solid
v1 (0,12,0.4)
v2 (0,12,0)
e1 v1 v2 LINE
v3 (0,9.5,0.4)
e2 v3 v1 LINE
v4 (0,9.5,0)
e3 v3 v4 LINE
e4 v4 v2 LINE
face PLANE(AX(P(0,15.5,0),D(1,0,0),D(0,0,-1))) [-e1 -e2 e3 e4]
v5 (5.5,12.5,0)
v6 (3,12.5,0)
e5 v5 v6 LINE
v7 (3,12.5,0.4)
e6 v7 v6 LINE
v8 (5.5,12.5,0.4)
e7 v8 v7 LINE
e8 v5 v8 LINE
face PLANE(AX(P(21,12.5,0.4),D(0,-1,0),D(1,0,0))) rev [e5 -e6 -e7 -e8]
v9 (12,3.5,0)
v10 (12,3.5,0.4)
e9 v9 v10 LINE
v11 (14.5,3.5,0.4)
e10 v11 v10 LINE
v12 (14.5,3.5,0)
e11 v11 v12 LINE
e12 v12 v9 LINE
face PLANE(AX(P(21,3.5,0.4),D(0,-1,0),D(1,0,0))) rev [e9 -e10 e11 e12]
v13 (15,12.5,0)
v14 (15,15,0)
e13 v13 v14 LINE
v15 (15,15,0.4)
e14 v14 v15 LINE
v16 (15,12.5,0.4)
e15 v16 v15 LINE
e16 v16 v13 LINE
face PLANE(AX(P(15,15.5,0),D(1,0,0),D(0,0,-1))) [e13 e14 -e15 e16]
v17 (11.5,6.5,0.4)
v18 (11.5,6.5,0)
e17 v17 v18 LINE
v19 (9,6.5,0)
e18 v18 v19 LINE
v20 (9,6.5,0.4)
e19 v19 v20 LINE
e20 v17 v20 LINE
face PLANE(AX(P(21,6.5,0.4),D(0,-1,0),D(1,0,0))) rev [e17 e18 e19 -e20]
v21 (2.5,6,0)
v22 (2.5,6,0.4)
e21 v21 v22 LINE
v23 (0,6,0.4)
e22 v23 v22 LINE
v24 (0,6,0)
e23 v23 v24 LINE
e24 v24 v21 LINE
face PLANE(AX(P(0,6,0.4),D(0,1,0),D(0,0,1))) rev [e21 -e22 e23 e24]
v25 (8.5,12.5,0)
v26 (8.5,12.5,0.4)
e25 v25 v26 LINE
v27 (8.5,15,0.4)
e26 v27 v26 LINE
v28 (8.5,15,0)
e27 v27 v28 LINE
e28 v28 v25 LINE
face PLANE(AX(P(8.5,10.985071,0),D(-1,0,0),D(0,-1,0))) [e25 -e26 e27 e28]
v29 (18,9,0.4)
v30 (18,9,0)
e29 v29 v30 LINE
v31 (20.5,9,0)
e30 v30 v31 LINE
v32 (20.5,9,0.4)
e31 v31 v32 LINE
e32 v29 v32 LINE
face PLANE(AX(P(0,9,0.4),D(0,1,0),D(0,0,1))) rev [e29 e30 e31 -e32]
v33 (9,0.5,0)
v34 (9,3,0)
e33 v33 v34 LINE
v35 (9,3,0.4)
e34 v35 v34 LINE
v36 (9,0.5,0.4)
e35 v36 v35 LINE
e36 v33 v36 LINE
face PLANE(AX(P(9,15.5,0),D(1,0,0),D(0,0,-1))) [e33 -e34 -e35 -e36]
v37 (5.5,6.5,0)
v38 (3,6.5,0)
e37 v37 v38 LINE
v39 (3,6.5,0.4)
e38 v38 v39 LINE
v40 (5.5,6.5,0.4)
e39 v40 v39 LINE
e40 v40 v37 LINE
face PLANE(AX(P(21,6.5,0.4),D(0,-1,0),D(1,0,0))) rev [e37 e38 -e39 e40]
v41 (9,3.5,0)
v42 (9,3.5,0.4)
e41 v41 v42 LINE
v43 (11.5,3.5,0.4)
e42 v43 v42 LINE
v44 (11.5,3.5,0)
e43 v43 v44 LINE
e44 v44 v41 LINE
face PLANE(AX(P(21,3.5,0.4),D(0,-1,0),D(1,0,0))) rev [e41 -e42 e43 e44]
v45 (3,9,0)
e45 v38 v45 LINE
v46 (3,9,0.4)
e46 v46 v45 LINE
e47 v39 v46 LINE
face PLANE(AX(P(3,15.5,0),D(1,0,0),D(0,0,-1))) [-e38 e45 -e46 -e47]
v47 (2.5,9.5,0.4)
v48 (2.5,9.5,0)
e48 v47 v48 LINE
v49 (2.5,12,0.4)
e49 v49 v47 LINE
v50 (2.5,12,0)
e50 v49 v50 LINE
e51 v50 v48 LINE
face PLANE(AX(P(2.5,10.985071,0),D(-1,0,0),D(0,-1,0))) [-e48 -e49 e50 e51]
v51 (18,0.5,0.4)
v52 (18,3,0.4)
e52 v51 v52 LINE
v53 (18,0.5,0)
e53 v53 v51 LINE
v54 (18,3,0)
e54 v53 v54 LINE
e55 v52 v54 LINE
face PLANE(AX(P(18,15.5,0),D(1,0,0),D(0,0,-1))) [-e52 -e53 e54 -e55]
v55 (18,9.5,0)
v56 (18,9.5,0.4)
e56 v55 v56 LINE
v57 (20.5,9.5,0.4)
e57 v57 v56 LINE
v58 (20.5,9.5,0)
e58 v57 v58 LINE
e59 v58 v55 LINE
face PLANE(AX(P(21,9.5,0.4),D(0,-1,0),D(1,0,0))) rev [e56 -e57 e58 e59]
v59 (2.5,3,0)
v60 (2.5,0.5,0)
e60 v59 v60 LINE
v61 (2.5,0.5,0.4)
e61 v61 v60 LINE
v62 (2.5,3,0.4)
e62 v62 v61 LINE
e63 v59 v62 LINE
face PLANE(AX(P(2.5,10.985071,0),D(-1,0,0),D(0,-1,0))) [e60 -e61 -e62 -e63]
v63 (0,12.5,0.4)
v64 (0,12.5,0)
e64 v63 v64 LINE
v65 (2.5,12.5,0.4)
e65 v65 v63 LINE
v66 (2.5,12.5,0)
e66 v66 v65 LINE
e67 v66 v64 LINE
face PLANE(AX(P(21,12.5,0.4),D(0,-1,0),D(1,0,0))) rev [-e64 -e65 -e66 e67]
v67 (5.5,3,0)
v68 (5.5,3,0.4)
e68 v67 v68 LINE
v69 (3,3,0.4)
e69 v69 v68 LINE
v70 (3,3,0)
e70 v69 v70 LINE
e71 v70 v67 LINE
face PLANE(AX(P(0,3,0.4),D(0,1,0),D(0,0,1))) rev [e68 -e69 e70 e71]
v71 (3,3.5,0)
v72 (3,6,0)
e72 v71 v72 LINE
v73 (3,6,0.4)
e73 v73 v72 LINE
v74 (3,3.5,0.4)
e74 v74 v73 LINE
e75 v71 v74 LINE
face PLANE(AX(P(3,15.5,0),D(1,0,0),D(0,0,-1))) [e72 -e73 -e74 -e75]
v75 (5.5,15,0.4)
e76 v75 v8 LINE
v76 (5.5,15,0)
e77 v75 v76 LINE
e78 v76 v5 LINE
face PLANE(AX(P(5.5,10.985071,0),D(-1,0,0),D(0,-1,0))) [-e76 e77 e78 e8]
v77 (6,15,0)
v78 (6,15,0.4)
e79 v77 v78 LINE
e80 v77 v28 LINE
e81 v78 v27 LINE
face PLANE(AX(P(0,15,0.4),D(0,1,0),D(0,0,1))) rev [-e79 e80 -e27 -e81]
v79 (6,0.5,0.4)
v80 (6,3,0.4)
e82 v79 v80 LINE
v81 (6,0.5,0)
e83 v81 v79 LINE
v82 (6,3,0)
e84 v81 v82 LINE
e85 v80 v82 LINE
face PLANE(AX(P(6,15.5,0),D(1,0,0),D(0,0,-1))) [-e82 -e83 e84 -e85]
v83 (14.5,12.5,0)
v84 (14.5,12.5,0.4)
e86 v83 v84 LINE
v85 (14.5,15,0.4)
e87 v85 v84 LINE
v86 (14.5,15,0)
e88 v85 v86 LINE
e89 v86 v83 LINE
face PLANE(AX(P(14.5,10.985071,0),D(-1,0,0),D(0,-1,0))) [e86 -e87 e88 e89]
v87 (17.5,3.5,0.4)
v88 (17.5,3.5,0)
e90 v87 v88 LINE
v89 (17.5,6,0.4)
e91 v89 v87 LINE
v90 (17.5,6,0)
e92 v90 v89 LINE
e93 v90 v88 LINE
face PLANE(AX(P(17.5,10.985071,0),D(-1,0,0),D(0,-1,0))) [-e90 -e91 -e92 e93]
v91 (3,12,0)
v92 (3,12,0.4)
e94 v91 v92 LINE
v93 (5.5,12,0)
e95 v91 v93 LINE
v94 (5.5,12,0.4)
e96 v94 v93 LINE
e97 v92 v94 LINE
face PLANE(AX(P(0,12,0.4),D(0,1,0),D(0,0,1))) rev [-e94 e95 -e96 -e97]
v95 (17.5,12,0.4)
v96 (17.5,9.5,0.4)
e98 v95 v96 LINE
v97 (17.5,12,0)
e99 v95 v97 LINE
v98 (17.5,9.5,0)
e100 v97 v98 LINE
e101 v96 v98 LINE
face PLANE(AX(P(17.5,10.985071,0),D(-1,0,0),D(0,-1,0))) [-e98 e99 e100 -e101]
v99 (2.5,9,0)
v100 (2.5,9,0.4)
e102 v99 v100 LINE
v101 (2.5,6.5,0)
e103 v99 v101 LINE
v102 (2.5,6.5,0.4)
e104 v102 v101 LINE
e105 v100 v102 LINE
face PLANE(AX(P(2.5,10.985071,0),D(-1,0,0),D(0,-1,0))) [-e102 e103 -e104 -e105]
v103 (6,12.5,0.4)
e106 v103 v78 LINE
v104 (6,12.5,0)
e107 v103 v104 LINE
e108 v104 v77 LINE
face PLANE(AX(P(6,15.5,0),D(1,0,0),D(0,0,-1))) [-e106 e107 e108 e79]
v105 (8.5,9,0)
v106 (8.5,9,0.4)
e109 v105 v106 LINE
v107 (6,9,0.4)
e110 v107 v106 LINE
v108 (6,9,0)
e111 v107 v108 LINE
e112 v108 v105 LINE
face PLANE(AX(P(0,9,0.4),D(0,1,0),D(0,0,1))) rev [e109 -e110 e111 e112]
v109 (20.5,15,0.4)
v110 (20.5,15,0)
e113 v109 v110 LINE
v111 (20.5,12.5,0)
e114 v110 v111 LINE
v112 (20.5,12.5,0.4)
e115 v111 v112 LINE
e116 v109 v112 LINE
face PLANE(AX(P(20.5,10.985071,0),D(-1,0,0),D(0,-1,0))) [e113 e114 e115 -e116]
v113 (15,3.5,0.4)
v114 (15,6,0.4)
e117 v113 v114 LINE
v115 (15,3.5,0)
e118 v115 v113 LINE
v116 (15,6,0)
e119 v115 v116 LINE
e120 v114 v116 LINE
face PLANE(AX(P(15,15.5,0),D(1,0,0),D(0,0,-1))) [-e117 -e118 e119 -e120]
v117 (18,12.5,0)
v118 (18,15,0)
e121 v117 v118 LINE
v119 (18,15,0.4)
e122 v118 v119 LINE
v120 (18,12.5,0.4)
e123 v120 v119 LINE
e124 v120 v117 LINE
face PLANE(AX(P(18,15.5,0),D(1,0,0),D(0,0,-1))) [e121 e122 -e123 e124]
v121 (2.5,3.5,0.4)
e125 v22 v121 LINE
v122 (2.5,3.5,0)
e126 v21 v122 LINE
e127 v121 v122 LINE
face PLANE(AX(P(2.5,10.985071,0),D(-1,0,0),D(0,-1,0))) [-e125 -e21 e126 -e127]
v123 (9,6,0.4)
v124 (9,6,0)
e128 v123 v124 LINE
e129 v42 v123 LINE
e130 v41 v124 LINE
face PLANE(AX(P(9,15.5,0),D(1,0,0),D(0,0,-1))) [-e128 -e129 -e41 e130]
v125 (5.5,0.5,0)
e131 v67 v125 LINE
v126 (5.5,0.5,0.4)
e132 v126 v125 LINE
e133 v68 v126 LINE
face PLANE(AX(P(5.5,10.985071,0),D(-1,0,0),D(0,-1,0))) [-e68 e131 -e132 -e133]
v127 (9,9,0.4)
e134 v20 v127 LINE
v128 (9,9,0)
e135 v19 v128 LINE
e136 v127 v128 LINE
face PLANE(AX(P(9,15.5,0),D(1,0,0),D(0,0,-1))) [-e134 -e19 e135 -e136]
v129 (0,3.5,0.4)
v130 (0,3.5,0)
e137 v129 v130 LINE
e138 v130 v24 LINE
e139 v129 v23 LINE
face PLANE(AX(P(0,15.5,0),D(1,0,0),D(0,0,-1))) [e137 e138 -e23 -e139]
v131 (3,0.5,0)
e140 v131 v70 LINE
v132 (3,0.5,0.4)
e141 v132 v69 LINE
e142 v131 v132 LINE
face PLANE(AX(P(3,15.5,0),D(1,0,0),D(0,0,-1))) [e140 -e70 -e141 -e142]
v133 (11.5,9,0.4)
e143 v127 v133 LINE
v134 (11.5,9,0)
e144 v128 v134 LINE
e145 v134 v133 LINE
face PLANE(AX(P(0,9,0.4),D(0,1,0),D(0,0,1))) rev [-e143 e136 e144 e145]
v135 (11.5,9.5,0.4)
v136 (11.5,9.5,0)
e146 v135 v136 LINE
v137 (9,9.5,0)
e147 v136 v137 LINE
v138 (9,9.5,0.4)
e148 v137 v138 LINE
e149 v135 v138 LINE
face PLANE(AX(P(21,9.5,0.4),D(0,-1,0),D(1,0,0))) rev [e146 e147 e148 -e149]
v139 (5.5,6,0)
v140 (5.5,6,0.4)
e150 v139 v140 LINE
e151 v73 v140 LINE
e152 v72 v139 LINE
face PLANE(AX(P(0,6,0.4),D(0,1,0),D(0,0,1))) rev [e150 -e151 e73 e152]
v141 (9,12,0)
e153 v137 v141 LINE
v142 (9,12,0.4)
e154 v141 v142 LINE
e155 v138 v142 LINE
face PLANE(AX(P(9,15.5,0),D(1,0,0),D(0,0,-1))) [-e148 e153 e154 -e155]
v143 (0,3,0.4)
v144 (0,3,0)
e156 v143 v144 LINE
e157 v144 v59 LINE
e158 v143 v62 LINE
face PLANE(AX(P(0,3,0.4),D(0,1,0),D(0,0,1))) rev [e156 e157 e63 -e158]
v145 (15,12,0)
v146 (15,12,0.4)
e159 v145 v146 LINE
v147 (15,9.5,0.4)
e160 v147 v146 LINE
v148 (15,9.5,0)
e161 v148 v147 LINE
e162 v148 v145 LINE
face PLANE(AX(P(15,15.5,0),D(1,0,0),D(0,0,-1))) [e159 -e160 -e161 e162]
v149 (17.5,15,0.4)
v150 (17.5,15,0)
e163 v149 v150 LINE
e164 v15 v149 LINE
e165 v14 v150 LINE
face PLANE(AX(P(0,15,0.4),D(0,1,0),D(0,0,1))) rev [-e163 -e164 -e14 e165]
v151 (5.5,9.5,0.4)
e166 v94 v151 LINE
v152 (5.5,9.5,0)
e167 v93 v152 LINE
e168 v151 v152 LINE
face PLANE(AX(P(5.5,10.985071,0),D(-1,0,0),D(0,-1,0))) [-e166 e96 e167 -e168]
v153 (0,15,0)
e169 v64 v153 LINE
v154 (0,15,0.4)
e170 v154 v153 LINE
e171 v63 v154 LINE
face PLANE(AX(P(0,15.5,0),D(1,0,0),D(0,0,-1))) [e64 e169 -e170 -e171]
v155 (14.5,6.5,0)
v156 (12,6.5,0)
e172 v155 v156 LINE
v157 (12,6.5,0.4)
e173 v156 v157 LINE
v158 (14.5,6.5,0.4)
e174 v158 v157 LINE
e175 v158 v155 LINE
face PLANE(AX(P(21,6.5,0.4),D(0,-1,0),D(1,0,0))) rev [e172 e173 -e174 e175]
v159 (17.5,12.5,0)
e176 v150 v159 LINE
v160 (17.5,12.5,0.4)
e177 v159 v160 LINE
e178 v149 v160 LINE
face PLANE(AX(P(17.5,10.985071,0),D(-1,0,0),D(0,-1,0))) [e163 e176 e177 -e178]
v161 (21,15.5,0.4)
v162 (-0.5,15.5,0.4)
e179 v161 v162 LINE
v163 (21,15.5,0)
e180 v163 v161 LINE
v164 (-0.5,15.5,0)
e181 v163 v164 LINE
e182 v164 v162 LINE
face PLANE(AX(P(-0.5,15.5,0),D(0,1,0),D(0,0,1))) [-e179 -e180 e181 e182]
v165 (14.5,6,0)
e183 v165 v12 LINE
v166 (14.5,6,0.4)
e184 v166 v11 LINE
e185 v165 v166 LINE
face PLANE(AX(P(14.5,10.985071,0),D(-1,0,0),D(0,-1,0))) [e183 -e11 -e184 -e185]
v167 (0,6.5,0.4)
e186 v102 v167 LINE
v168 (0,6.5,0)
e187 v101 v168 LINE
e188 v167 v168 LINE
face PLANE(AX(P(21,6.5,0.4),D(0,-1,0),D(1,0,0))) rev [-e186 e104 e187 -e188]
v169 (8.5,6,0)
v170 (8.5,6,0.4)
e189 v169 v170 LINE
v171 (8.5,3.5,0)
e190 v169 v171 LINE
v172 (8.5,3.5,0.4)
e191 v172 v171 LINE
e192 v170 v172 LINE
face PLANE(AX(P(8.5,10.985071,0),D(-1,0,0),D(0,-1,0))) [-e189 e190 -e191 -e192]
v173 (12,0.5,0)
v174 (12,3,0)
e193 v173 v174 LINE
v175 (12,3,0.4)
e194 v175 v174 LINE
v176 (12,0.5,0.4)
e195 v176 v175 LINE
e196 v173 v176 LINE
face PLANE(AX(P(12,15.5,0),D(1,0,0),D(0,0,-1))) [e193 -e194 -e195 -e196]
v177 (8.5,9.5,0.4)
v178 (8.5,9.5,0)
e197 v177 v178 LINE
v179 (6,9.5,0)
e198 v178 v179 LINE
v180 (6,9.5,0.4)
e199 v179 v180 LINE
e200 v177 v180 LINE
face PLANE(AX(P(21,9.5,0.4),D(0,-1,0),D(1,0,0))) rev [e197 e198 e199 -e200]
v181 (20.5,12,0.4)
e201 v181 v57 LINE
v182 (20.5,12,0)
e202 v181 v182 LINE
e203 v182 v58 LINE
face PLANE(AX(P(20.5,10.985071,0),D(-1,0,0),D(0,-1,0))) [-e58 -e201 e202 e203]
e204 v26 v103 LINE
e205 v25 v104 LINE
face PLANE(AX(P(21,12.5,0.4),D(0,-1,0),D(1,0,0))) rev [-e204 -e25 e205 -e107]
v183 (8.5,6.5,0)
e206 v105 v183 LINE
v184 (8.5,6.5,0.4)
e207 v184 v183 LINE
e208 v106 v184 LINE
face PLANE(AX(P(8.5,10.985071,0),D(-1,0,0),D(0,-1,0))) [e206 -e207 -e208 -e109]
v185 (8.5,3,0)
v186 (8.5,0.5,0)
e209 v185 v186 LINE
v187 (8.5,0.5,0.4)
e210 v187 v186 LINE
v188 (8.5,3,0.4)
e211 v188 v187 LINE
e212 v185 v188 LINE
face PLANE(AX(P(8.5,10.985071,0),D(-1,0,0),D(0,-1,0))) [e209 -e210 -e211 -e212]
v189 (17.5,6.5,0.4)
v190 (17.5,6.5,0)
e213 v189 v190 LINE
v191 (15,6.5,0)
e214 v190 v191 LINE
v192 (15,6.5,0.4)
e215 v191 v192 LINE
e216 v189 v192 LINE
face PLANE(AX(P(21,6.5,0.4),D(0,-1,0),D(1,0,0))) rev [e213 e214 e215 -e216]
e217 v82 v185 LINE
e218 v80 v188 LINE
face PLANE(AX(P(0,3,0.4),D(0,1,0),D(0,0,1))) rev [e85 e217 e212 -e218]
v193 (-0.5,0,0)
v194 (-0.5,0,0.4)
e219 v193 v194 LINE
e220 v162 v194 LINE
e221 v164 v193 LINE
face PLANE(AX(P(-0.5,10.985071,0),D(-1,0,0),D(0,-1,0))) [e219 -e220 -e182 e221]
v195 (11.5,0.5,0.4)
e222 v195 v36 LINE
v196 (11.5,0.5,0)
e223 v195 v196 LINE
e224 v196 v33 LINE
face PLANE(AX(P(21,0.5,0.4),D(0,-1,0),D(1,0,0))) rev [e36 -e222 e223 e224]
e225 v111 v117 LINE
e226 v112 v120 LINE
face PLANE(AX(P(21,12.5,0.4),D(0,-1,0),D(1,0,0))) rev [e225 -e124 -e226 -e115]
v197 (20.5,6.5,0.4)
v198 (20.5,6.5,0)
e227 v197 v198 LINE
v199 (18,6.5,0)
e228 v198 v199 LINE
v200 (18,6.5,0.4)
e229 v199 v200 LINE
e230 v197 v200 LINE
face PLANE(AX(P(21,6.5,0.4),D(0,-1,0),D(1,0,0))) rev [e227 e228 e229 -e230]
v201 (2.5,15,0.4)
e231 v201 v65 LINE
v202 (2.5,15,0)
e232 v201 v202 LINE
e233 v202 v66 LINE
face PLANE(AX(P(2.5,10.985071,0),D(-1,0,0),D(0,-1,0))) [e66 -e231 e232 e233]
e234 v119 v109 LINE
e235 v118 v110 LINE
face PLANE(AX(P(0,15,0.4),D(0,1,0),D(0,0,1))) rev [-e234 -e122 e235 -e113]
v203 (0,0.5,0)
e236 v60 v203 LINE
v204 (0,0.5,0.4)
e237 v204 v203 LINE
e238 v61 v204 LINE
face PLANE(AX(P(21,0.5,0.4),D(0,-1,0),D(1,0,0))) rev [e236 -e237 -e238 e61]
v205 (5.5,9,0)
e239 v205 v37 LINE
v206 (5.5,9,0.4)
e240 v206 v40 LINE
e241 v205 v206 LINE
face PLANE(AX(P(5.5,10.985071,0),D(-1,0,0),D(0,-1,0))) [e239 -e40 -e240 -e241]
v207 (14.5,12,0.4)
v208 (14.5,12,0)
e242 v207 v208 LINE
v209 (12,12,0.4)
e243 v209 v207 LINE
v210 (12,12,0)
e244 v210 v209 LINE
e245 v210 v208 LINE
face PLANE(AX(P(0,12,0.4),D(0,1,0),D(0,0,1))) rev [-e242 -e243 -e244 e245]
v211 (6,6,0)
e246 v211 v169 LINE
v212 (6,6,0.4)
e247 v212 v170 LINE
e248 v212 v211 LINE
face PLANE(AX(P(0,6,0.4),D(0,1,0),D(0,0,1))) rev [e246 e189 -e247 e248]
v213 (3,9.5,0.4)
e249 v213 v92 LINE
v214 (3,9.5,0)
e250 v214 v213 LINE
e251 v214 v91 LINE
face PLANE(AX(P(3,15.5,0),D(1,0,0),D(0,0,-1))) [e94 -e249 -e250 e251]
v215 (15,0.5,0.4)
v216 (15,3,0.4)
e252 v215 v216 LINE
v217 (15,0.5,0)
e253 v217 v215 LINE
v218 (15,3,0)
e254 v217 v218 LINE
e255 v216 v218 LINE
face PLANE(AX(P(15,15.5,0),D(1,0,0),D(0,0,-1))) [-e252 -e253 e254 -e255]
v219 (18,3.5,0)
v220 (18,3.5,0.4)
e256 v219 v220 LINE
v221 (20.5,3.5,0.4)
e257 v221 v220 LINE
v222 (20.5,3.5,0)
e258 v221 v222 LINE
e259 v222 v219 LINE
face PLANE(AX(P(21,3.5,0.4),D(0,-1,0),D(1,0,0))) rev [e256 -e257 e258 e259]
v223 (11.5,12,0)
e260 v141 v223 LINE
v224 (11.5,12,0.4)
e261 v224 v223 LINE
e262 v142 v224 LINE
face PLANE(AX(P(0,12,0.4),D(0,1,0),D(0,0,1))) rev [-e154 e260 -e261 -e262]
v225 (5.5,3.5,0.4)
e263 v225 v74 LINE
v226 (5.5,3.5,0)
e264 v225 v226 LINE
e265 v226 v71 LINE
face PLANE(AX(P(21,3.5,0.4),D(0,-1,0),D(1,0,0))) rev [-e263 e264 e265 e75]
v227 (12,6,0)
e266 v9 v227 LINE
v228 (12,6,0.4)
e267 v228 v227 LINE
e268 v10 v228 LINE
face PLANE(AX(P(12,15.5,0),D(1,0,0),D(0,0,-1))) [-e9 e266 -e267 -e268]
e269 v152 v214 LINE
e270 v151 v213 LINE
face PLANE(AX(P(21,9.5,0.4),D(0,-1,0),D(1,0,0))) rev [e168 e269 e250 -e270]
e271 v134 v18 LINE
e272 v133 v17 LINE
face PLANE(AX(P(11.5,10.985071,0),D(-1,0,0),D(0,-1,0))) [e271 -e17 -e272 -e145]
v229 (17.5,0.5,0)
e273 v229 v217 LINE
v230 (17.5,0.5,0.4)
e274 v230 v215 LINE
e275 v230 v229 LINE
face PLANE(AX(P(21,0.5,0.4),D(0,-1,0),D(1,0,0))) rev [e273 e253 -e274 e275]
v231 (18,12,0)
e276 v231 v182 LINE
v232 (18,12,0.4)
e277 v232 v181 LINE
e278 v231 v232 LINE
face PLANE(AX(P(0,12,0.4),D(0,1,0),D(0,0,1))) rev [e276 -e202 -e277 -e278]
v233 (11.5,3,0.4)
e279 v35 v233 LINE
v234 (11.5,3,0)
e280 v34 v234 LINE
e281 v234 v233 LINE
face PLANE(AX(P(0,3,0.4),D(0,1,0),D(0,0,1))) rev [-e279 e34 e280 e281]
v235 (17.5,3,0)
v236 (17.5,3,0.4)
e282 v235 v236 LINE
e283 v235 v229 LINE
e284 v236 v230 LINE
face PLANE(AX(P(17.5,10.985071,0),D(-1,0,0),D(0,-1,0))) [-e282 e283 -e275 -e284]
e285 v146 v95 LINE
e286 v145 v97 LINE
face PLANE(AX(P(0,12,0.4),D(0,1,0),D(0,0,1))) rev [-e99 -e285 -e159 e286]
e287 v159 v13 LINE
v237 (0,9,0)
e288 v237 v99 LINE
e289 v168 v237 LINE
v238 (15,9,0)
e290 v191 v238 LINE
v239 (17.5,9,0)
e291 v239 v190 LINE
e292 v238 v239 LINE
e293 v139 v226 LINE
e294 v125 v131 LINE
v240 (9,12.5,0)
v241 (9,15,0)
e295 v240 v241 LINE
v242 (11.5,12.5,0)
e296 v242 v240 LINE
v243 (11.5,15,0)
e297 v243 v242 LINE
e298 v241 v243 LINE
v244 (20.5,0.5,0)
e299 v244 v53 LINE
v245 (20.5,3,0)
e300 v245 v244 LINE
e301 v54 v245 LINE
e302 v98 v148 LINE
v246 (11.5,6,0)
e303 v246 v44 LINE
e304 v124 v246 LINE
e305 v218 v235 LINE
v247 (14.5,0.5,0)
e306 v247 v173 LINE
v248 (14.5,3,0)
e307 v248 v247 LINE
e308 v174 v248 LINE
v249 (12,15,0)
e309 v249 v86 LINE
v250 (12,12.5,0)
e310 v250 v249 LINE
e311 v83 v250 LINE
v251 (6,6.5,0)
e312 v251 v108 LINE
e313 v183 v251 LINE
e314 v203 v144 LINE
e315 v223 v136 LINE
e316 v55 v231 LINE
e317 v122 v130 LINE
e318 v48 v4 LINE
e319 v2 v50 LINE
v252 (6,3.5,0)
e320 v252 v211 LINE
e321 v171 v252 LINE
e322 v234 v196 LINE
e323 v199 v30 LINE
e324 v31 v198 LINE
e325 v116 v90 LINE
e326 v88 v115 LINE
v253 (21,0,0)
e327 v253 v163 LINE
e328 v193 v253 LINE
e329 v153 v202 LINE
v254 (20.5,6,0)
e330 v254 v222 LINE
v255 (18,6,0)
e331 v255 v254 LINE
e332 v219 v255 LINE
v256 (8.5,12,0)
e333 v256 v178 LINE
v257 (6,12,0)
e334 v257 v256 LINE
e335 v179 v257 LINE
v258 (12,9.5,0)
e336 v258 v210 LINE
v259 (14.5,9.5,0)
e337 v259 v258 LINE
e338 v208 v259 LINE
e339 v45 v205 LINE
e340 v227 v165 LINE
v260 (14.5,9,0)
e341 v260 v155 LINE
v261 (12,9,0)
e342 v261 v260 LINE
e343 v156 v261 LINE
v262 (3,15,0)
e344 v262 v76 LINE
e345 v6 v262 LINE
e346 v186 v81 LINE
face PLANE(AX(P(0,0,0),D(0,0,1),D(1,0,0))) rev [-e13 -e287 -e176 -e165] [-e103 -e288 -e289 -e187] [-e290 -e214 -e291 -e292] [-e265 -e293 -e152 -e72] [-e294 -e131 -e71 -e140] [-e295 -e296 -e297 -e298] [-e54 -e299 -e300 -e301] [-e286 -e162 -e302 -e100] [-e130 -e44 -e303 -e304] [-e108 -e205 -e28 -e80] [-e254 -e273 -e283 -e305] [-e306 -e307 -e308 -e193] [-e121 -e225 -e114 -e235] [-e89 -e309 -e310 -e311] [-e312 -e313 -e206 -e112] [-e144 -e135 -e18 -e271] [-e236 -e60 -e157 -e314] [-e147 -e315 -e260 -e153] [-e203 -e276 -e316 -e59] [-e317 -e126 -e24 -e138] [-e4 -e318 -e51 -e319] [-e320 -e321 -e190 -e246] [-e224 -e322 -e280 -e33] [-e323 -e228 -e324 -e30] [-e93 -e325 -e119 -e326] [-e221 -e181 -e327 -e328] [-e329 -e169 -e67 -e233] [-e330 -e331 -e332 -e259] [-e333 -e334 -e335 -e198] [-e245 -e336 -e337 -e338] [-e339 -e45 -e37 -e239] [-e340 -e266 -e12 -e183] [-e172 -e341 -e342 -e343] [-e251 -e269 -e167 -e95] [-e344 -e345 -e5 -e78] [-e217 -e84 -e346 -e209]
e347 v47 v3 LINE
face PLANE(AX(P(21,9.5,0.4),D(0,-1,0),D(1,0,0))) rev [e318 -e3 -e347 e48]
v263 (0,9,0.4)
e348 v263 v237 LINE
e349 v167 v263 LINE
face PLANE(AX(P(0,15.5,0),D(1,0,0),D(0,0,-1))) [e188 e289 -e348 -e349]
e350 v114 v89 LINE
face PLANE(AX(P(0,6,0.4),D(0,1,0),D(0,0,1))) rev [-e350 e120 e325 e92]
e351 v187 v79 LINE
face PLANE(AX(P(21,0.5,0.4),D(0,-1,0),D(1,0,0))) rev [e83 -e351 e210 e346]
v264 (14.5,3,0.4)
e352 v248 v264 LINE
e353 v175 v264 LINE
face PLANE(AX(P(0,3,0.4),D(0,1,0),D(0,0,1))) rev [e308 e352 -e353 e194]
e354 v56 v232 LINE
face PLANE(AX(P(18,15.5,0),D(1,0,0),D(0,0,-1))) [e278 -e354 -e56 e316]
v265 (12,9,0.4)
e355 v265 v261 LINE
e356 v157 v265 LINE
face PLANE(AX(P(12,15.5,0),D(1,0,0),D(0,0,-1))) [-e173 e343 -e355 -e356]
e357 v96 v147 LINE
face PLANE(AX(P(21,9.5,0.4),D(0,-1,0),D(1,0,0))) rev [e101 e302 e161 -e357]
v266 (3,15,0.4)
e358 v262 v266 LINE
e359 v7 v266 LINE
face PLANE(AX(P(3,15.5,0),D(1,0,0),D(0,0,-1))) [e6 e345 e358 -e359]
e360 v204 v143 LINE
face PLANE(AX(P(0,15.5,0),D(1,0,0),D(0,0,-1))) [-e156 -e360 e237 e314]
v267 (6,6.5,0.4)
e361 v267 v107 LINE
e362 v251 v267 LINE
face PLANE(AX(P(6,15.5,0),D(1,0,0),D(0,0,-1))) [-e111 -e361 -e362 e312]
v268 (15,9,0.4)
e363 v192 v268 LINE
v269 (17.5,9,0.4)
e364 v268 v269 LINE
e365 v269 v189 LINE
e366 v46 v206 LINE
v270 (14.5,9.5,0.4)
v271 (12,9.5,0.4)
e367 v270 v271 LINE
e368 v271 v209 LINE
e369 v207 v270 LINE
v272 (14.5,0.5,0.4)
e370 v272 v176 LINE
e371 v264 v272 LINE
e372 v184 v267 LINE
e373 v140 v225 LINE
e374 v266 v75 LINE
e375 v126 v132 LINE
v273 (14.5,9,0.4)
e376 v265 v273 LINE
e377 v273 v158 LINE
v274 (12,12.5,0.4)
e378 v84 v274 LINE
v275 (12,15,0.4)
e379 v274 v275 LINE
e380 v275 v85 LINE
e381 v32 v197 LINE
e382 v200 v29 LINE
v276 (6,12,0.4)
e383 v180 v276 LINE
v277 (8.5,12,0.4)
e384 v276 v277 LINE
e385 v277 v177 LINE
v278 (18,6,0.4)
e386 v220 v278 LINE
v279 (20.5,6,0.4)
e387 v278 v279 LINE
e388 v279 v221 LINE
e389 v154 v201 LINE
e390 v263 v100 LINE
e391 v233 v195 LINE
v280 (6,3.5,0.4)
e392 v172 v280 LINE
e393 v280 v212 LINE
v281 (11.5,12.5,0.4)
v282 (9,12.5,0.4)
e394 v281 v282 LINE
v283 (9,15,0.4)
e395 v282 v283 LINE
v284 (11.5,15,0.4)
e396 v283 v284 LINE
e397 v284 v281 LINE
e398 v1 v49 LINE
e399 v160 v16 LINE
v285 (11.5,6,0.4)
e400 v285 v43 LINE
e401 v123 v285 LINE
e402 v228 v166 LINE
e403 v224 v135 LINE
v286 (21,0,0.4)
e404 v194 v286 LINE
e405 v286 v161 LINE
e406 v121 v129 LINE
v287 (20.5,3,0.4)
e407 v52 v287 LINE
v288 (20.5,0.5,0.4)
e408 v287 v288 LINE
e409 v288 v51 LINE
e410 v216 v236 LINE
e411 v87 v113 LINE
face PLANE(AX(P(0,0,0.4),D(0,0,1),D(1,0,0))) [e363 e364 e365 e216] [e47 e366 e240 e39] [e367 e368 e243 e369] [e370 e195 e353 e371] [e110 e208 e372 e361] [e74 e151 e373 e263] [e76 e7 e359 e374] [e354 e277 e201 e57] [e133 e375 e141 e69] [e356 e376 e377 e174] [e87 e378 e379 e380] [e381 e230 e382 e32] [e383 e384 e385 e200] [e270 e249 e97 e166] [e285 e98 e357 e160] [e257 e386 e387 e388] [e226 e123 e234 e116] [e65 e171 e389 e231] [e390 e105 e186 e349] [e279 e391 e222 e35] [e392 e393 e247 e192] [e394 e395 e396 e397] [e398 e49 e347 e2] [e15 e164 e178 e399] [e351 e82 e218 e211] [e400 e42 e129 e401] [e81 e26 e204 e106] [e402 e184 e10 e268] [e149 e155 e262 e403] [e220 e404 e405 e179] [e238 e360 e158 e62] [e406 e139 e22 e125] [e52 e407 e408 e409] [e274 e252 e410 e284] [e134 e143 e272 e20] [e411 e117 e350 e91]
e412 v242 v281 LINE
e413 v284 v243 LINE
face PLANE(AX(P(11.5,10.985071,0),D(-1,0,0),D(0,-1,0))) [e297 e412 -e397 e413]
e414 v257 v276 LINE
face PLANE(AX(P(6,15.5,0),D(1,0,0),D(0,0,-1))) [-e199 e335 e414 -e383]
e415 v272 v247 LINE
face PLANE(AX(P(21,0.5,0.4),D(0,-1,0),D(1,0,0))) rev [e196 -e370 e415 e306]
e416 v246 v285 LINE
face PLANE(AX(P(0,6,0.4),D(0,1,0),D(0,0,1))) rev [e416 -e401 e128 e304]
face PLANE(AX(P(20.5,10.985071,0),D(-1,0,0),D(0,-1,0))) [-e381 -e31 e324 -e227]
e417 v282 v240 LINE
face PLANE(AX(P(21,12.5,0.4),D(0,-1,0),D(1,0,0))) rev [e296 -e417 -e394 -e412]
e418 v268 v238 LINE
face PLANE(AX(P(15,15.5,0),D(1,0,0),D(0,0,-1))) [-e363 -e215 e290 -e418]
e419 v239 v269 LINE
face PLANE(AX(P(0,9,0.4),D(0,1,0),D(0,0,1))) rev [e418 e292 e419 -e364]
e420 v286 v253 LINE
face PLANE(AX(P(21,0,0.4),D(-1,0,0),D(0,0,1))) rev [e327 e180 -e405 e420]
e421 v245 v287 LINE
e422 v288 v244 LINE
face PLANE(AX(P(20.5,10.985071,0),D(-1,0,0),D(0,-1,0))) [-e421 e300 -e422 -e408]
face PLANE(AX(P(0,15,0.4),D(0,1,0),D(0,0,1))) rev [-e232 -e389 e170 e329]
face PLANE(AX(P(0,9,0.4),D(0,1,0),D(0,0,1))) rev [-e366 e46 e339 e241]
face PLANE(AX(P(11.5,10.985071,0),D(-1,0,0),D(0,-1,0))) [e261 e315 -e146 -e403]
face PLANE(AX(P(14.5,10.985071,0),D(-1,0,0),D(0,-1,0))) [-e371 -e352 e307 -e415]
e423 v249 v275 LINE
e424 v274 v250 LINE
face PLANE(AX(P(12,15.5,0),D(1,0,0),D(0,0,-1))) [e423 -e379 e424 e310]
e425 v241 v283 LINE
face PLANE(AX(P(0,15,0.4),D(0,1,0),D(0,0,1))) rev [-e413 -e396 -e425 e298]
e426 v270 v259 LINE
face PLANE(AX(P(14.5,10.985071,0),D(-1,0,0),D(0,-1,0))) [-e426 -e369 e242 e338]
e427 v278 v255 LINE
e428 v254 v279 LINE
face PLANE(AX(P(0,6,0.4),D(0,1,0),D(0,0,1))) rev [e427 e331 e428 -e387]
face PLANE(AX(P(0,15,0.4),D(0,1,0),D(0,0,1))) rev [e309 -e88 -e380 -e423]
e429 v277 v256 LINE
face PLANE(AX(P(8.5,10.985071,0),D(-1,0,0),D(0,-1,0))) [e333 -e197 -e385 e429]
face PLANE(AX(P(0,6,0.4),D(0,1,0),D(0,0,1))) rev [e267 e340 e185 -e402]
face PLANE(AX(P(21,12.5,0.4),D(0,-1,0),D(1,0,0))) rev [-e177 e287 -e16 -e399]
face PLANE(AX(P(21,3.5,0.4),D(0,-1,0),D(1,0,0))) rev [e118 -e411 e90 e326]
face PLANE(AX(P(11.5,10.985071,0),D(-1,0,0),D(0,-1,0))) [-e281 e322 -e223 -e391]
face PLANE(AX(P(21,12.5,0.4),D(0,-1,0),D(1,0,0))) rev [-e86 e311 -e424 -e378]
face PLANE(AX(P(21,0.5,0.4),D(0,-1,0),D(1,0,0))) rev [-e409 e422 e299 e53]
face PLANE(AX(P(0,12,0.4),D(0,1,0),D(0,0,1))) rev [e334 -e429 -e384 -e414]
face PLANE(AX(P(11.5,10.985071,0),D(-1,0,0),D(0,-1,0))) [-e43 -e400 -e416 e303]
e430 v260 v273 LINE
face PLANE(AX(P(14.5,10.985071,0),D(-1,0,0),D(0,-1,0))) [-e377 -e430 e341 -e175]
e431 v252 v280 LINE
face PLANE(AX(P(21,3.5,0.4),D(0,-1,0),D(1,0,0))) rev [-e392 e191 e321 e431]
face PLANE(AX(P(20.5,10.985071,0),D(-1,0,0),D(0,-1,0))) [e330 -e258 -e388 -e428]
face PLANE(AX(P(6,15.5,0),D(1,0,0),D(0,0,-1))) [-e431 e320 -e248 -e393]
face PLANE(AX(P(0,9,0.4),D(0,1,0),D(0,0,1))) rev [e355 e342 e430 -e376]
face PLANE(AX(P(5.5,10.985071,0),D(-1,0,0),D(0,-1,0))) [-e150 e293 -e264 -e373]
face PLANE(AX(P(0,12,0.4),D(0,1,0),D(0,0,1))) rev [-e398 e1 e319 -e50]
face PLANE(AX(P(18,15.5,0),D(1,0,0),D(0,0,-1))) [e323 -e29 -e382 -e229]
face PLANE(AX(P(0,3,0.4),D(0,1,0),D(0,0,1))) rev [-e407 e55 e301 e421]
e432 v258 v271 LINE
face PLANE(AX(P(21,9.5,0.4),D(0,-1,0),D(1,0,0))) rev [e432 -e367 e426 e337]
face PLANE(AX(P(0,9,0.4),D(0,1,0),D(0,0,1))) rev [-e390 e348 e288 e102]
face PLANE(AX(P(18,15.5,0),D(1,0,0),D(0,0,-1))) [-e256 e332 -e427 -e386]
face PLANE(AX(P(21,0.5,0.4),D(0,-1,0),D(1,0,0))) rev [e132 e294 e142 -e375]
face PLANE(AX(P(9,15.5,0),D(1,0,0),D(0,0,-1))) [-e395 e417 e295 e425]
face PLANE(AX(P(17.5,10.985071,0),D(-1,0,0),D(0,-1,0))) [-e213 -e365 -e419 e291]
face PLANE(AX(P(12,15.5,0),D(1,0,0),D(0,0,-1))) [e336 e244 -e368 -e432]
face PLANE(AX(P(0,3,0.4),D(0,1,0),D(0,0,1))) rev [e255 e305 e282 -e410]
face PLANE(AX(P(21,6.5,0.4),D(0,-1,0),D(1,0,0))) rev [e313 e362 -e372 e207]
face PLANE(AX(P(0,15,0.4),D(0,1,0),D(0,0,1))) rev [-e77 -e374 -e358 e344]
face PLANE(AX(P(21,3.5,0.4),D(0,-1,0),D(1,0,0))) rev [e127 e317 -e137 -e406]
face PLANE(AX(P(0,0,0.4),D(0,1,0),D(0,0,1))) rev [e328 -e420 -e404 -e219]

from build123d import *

# Parameters (mm, degrees)
SKETCH_1_W             = 21
SKETCH_1_H             = 0.5
EXTRUDE_1_DEPTH        = 0.4
PATTERN_LINEAR_1_COUNT = 6
PATTERN_LINEAR_1_PITCH = 3
EXTRUDE_3_DEPTH        = 0.4
PATTERN_LINEAR_2_COUNT = 8
PATTERN_LINEAR_2_PITCH = 3


with BuildPart() as part:
    # 草图1 → 凸台-拉伸1 (new body)
    with BuildSketch(Plane.XY):
        with Locations((10.5, 0.25)):
            Rectangle(SKETCH_1_W, SKETCH_1_H)
    extrude(amount=EXTRUDE_1_DEPTH)


with BuildPart() as pattern_linear_1_1:
    # 阵列(线性)1: pattern copy
    add(part.part.moved(Location(Vector(0, 1, 0) * (1 * PATTERN_LINEAR_1_PITCH))))


with BuildPart() as pattern_linear_1_2:
    # 阵列(线性)1: pattern copy
    add(part.part.moved(Location(Vector(0, 1, 0) * (2 * PATTERN_LINEAR_1_PITCH))))


with BuildPart() as pattern_linear_1_3:
    # 阵列(线性)1: pattern copy
    add(part.part.moved(Location(Vector(0, 1, 0) * (3 * PATTERN_LINEAR_1_PITCH))))


with BuildPart() as pattern_linear_1_4:
    # 阵列(线性)1: pattern copy
    add(part.part.moved(Location(Vector(0, 1, 0) * (4 * PATTERN_LINEAR_1_PITCH))))


with BuildPart() as pattern_linear_1_5:
    # 阵列(线性)1: pattern copy
    add(part.part.moved(Location(Vector(0, 1, 0) * (5 * PATTERN_LINEAR_1_PITCH))))


with BuildPart() as part_1:
    add(part.part)

    add(pattern_linear_1_1.part)  # 凸台-拉伸3 merges 阵列(线性)1_1

    add(pattern_linear_1_2.part)  # 凸台-拉伸3 merges 阵列(线性)1_2

    add(pattern_linear_1_3.part)  # 凸台-拉伸3 merges 阵列(线性)1_3
    # 草图3 → 凸台-拉伸3 (add)
    with BuildSketch(Plane.XY.offset(0.4)):
        Polygon((0, 15.5), (0, 9.5), (0, 0), (-0.5, 0), (-0.5, 10.98507125), (-0.5, 15.5), align=None)
    extrude_3 = extrude(amount=-EXTRUDE_3_DEPTH)

    # 阵列(线性)2: 凸台-拉伸3 ×8
    with Locations(*[(i * PATTERN_LINEAR_2_PITCH, 0, 0) for i in range(1, PATTERN_LINEAR_2_COUNT)]):
        add(extrude_3)

    # Combine 1: read off the stored shape, not the designer's step
    # Combine 1: union 阵列(线性)1_4, 阵列(线性)1_5
    add(pattern_linear_1_4.part)
    add(pattern_linear_1_5.part)


solid = part_1.part
